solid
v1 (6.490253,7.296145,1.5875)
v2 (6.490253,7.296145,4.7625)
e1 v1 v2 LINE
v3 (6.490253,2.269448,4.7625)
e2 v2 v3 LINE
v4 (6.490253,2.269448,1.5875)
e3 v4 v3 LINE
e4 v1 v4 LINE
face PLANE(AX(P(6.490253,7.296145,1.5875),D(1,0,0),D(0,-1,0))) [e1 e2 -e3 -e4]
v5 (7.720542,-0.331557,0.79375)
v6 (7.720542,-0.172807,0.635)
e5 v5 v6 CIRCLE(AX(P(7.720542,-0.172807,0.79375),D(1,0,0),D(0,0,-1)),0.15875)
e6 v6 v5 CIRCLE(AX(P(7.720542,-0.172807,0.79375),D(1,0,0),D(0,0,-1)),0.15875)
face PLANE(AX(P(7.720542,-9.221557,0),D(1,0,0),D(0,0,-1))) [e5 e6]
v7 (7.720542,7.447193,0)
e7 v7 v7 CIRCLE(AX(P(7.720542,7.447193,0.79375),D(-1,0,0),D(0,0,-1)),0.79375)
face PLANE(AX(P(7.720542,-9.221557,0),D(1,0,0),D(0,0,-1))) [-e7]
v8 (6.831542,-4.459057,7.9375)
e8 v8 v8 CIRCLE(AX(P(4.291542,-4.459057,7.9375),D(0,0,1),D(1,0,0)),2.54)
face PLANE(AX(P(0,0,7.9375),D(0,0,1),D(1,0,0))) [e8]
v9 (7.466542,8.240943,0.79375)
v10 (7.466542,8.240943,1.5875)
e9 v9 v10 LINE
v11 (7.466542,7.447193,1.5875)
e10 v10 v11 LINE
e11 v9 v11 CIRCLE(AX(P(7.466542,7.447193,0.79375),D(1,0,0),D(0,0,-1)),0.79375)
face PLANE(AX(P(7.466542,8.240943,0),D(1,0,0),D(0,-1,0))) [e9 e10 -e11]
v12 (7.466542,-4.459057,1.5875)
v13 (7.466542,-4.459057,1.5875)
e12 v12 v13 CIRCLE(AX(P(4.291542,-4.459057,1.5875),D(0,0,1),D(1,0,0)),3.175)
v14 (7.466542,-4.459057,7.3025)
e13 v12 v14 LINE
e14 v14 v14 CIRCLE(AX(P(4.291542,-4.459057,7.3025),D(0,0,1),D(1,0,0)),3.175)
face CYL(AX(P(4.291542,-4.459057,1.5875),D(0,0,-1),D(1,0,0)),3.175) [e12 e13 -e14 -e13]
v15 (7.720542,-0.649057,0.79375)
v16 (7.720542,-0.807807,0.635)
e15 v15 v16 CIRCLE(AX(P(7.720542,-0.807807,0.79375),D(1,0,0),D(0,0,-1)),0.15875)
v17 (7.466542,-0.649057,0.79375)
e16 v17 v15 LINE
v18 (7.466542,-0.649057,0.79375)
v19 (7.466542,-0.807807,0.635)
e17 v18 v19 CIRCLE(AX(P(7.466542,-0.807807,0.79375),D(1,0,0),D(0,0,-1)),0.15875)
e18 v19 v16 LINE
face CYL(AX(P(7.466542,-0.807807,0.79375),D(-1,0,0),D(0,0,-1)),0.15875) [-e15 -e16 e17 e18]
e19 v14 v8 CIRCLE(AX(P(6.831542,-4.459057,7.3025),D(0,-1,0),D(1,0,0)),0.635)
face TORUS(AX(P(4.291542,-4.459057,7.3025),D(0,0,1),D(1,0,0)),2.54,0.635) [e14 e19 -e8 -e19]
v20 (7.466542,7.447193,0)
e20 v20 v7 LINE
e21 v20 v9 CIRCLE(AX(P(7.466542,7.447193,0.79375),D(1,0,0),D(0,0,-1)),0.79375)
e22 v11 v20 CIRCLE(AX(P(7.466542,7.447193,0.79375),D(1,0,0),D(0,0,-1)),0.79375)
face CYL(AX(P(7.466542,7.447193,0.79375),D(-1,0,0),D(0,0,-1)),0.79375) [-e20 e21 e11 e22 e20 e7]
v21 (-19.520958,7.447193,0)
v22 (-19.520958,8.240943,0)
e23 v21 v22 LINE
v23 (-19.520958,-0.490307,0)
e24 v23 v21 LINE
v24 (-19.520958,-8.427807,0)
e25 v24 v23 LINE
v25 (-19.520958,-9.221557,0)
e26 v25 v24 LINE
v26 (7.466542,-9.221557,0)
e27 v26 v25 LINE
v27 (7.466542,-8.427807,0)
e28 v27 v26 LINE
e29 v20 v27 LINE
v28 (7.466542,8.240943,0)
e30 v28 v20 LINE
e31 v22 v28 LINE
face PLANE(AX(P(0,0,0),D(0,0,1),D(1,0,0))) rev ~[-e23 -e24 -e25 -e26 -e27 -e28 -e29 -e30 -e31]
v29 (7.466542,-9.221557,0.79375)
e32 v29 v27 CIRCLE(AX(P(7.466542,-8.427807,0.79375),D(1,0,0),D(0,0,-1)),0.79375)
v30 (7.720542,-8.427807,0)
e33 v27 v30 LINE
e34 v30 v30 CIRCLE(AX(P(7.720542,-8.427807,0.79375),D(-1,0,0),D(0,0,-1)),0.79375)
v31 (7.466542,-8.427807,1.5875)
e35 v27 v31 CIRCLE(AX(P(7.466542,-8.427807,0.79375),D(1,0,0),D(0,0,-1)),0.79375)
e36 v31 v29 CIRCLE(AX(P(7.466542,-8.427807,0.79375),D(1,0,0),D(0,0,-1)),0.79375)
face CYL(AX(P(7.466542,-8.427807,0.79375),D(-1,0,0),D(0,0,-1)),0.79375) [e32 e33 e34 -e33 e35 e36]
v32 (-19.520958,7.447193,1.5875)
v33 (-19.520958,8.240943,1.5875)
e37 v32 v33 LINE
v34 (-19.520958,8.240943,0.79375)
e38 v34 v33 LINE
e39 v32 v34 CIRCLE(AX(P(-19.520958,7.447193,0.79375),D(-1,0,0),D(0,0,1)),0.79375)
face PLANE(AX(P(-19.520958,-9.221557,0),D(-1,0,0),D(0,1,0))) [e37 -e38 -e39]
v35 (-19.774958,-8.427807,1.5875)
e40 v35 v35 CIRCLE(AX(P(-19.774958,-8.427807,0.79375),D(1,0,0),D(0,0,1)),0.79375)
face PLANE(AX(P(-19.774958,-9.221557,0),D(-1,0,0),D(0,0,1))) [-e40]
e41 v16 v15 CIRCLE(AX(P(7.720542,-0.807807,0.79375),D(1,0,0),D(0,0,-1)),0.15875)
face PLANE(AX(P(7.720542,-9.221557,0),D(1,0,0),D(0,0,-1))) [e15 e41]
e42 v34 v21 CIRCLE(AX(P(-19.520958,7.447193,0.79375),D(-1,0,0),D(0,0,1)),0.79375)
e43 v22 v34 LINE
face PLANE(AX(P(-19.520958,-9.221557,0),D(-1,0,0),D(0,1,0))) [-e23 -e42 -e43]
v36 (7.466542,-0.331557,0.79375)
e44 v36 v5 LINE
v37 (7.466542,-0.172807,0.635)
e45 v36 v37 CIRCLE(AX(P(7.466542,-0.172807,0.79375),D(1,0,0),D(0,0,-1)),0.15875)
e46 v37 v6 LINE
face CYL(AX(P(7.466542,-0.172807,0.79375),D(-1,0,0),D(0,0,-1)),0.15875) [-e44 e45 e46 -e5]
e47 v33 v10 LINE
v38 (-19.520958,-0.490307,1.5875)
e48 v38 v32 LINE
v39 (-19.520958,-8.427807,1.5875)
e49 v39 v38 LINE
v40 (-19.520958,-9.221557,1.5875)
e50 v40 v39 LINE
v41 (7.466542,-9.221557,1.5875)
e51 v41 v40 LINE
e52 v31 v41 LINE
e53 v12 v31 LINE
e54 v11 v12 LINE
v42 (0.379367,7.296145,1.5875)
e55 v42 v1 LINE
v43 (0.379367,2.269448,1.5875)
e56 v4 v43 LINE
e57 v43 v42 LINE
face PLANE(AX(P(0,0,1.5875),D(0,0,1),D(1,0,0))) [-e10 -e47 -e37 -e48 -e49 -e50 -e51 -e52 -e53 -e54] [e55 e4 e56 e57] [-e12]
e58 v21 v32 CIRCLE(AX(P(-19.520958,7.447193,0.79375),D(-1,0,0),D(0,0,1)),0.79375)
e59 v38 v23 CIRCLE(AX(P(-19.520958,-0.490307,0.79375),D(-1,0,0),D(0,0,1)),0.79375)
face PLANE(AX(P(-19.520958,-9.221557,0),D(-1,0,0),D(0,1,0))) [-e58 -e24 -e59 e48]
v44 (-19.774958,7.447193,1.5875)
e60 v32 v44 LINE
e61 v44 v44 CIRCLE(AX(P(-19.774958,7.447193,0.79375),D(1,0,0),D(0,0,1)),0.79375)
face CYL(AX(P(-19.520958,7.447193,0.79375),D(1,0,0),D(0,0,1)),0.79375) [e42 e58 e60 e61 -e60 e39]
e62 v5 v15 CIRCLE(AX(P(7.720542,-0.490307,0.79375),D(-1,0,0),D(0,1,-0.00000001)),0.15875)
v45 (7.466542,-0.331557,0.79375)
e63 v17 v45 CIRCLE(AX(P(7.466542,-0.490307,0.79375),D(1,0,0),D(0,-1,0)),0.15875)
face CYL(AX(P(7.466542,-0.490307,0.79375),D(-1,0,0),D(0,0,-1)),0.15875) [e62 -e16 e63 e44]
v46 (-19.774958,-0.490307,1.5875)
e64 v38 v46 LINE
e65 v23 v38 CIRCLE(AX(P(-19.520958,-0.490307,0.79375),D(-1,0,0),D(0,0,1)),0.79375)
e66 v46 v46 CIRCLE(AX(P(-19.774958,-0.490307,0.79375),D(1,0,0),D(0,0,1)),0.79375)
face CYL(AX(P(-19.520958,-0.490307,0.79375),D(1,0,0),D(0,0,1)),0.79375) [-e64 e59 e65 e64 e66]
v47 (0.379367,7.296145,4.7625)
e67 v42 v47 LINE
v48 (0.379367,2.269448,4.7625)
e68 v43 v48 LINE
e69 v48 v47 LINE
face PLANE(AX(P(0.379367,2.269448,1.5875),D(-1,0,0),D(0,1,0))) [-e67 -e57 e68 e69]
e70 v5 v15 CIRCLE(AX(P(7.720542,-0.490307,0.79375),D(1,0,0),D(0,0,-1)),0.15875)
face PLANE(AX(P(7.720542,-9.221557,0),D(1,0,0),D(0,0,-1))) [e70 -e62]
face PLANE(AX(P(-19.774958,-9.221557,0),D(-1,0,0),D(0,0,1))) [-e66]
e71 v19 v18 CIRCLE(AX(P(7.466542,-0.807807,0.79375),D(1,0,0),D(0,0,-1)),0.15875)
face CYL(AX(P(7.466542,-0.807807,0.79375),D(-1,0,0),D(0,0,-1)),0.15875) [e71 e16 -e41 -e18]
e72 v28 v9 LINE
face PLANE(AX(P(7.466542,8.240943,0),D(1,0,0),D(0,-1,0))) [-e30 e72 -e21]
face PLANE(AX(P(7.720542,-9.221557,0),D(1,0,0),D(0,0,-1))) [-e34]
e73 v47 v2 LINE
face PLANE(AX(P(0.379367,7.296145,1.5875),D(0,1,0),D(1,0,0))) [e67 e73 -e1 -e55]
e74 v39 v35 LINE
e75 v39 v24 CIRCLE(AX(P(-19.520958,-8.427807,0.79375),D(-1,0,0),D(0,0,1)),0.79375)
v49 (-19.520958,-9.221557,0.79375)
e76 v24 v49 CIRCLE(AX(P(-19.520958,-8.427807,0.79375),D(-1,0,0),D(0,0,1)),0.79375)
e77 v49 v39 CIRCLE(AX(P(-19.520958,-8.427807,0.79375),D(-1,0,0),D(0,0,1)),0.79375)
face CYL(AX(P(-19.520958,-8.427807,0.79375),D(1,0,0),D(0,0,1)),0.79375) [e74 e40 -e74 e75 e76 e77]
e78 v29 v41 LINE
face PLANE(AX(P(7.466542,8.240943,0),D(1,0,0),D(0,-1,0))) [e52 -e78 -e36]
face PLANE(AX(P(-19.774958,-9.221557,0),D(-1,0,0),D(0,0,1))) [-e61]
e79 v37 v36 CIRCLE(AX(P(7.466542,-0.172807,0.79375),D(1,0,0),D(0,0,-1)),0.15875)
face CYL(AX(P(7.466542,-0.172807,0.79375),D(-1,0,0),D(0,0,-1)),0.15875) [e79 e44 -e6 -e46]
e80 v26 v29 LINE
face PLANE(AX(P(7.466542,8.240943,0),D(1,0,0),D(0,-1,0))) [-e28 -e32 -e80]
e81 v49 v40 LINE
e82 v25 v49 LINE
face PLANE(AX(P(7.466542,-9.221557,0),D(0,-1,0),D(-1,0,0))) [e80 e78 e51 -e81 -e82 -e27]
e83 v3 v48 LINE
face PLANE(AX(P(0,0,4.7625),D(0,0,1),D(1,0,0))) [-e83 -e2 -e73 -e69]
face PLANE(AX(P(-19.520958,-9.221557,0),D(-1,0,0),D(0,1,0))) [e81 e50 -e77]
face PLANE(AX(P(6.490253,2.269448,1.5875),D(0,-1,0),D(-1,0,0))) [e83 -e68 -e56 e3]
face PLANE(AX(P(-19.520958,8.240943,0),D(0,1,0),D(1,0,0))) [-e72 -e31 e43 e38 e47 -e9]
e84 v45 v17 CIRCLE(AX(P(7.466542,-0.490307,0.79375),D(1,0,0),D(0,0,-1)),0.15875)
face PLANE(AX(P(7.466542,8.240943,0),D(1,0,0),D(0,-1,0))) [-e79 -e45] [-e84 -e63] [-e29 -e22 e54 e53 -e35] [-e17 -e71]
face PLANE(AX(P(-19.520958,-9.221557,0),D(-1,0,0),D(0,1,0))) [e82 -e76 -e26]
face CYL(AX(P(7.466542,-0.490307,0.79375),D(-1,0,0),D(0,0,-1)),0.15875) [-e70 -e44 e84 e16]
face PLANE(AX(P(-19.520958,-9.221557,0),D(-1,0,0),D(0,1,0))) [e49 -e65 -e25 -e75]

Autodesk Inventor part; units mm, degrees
ref_plane "YZ Plane" through (0, 0, 0) normal (1, 0, 0) x (0, 1, 0)
ref_plane "XZ Plane" through (0, 0, 0) normal (0, 1, 0) x (-1, 0, 0)
ref_plane "XY Plane" through (0, 0, 0) normal (0, 0, 1) x (1, 0, 0)
sketch "Sketch1" plane through (0, 0, 0) normal (0, 0, 1) x (1, 0, 0)
  line L0 (-19.520958, 8.240943) -> (7.466542, 8.240943)
  line L1 (7.466542, 8.240943) -> (7.466542, -9.221557)
  line L2 (7.466542, -9.221557) -> (-19.520958, -9.221557)
  line L3 (-19.520958, -9.221557) -> (-19.520958, 8.240943)
  point P0 (0, 0)
  dimension "d0" = 17.4625
  dimension "d1" = 26.9875
extrude "Extrusion1" add sketch "Sketch1" along normal blind 1.5875
sketch "Sketch2" plane through (0, 0, 1.5875) normal (0, 0, 1) x (1, 0, 0)
  line L0 (7.466542, 8.240943) -> (7.466542, -9.221557)
  line L1 (7.466542, -9.221557) -> (-19.520958, -9.221557)
  circle A0 centre (4.291542, -4.459057) radius 3.175
  point P0 (0, 0)
  dimension "d4" = 4.7625
  dimension "d5" = 6.35
extrude "Extrusion2" add sketch "Sketch2" along normal blind 6.35
fillet "Fillet1" radius 0.635 1 edges at (1.1165, -4.4591, 7.9375)
sketch "Sketch3" plane through (0, 0, 1.5875) normal (0, 0, 1) x (1, 0, 0)
  line L0 (0.379367, 7.296145) -> (6.490253, 7.296145)
  line L1 (6.490253, 7.296145) -> (6.490253, 2.269448)
  line L2 (6.490253, 2.269448) -> (0.379367, 2.269448)
  line L3 (0.379367, 2.269448) -> (0.379367, 7.296145)
  point P0 (0, 0)
extrude "Extrusion3" add sketch "Sketch3" along normal blind 3.175
sketch "Sketch4" plane through (7.466542, -9.221557, 0) normal (1, 0, 0) x (0, 0, -1)
  line L0 (-1.5875, 17.4625) -> (-1.5875, 4.7625)
  line L1 (-1.5875, 4.7625) -> (-1.5875, 0)
  line L2 (0, 0) -> (-1.5875, 0)
  line L3 (0, 17.4625) -> (0, 0)
  line L4 (0, 17.4625) -> (-1.5875, 17.4625)
  circle A0 centre (-0.79375, 16.66875) radius 0.79375
  circle A1 centre (-0.79375, 0.79375) radius 0.79375
  circle A2 centre (-0.79375, 8.73125) radius 0.15875
  circle A3 centre (-0.79375, 9.04875) radius 0.15875
  circle A4 centre (-0.79375, 8.41375) radius 0.15875
  line L5 (-0.79375, 0.79375) -> (-0.79375, 16.66875) construction
  line L6 (-0.79375, 0.79375) -> (-0.79375, 8.73125) construction
  line L7 (-0.79375, 8.73125) -> (-0.79375, 16.66875) construction
  point P0 (0, 9.221557)
  dimension "d11" = 0.3175
extrude "Extrusion4" add sketch "Sketch4" along normal blind 0.254 contours A0 | A1 | A2 | A4 | A3
sketch "Sketch5" plane through (-19.520958, -9.221557, 0) normal (-1, 0, 0) x (0, 0, 1)
  line L0 (1.5875, 0) -> (1.5875, 17.4625)
  line L1 (0, 17.4625) -> (1.5875, 17.4625)
  line L2 (0, 0) -> (0, 17.4625)
  line L3 (0, 0) -> (1.5875, 0)
  circle A0 centre (0.79375, 16.66875) radius 0.79375
  circle A1 centre (0.79375, 8.73125) radius 0.79375
  circle A2 centre (0.79375, 0.79375) radius 0.79375
  line L4 (0.79375, 16.66875) -> (0.79375, 8.73125) construction
  line L5 (0.79375, 0.79375) -> (0.79375, 8.73125) construction
  point P0 (0, 9.221557)
extrude "Extrusion5" add sketch "Sketch5" along normal blind 0.254 contours A2 | A1 | A0
sketch "Sketch6" plane through (7.720542, -8.427807, 0.79375) normal (1, 0, 0) x (0, 0, -1)
  circle A0 centre (0, 0) radius 0.79375 construction
sketch "Sketch7" plane through (7.720542, -0.172807, 0.79375) normal (1, 0, 0) x (0, 0, -1)
  circle A0 centre (0, 0) radius 0.15875 construction
  point P0 (0, -0.15875)
sketch "Sketch8" plane through (7.720542, -9.221557, 0) normal (1, 0, 0) x (0, 0, -1)
  arc A0 (-0.79375, 8.5725) -> (-0.79375, 8.89) centre (-0.79375, 8.73125) ccw construction
sketch "Sketch9" plane through (7.720542, -0.807807, 0.79375) normal (1, 0, 0) x (0, 0, -1)
  circle A0 centre (0, 0) radius 0.15875 construction
  point P0 (0, 0.15875)
sketch "Sketch10" plane through (-19.774958, 7.447193, 0.79375) normal (-1, 0, 0) x (0, 0, 1)
  circle A0 centre (0, 0) radius 0.79375 construction
sketch "Sketch11" plane through (-19.774958, -0.490307, 0.79375) normal (-1, 0, 0) x (0, 0, 1)
  circle A0 centre (0, 0) radius 0.79375 construction
sketch "Sketch12" plane through (-19.774958, -8.427807, 0.79375) normal (-1, 0, 0) x (0, 0, 1)
  circle A0 centre (0, 0) radius 0.79375 construction
properties part number "ESC"
